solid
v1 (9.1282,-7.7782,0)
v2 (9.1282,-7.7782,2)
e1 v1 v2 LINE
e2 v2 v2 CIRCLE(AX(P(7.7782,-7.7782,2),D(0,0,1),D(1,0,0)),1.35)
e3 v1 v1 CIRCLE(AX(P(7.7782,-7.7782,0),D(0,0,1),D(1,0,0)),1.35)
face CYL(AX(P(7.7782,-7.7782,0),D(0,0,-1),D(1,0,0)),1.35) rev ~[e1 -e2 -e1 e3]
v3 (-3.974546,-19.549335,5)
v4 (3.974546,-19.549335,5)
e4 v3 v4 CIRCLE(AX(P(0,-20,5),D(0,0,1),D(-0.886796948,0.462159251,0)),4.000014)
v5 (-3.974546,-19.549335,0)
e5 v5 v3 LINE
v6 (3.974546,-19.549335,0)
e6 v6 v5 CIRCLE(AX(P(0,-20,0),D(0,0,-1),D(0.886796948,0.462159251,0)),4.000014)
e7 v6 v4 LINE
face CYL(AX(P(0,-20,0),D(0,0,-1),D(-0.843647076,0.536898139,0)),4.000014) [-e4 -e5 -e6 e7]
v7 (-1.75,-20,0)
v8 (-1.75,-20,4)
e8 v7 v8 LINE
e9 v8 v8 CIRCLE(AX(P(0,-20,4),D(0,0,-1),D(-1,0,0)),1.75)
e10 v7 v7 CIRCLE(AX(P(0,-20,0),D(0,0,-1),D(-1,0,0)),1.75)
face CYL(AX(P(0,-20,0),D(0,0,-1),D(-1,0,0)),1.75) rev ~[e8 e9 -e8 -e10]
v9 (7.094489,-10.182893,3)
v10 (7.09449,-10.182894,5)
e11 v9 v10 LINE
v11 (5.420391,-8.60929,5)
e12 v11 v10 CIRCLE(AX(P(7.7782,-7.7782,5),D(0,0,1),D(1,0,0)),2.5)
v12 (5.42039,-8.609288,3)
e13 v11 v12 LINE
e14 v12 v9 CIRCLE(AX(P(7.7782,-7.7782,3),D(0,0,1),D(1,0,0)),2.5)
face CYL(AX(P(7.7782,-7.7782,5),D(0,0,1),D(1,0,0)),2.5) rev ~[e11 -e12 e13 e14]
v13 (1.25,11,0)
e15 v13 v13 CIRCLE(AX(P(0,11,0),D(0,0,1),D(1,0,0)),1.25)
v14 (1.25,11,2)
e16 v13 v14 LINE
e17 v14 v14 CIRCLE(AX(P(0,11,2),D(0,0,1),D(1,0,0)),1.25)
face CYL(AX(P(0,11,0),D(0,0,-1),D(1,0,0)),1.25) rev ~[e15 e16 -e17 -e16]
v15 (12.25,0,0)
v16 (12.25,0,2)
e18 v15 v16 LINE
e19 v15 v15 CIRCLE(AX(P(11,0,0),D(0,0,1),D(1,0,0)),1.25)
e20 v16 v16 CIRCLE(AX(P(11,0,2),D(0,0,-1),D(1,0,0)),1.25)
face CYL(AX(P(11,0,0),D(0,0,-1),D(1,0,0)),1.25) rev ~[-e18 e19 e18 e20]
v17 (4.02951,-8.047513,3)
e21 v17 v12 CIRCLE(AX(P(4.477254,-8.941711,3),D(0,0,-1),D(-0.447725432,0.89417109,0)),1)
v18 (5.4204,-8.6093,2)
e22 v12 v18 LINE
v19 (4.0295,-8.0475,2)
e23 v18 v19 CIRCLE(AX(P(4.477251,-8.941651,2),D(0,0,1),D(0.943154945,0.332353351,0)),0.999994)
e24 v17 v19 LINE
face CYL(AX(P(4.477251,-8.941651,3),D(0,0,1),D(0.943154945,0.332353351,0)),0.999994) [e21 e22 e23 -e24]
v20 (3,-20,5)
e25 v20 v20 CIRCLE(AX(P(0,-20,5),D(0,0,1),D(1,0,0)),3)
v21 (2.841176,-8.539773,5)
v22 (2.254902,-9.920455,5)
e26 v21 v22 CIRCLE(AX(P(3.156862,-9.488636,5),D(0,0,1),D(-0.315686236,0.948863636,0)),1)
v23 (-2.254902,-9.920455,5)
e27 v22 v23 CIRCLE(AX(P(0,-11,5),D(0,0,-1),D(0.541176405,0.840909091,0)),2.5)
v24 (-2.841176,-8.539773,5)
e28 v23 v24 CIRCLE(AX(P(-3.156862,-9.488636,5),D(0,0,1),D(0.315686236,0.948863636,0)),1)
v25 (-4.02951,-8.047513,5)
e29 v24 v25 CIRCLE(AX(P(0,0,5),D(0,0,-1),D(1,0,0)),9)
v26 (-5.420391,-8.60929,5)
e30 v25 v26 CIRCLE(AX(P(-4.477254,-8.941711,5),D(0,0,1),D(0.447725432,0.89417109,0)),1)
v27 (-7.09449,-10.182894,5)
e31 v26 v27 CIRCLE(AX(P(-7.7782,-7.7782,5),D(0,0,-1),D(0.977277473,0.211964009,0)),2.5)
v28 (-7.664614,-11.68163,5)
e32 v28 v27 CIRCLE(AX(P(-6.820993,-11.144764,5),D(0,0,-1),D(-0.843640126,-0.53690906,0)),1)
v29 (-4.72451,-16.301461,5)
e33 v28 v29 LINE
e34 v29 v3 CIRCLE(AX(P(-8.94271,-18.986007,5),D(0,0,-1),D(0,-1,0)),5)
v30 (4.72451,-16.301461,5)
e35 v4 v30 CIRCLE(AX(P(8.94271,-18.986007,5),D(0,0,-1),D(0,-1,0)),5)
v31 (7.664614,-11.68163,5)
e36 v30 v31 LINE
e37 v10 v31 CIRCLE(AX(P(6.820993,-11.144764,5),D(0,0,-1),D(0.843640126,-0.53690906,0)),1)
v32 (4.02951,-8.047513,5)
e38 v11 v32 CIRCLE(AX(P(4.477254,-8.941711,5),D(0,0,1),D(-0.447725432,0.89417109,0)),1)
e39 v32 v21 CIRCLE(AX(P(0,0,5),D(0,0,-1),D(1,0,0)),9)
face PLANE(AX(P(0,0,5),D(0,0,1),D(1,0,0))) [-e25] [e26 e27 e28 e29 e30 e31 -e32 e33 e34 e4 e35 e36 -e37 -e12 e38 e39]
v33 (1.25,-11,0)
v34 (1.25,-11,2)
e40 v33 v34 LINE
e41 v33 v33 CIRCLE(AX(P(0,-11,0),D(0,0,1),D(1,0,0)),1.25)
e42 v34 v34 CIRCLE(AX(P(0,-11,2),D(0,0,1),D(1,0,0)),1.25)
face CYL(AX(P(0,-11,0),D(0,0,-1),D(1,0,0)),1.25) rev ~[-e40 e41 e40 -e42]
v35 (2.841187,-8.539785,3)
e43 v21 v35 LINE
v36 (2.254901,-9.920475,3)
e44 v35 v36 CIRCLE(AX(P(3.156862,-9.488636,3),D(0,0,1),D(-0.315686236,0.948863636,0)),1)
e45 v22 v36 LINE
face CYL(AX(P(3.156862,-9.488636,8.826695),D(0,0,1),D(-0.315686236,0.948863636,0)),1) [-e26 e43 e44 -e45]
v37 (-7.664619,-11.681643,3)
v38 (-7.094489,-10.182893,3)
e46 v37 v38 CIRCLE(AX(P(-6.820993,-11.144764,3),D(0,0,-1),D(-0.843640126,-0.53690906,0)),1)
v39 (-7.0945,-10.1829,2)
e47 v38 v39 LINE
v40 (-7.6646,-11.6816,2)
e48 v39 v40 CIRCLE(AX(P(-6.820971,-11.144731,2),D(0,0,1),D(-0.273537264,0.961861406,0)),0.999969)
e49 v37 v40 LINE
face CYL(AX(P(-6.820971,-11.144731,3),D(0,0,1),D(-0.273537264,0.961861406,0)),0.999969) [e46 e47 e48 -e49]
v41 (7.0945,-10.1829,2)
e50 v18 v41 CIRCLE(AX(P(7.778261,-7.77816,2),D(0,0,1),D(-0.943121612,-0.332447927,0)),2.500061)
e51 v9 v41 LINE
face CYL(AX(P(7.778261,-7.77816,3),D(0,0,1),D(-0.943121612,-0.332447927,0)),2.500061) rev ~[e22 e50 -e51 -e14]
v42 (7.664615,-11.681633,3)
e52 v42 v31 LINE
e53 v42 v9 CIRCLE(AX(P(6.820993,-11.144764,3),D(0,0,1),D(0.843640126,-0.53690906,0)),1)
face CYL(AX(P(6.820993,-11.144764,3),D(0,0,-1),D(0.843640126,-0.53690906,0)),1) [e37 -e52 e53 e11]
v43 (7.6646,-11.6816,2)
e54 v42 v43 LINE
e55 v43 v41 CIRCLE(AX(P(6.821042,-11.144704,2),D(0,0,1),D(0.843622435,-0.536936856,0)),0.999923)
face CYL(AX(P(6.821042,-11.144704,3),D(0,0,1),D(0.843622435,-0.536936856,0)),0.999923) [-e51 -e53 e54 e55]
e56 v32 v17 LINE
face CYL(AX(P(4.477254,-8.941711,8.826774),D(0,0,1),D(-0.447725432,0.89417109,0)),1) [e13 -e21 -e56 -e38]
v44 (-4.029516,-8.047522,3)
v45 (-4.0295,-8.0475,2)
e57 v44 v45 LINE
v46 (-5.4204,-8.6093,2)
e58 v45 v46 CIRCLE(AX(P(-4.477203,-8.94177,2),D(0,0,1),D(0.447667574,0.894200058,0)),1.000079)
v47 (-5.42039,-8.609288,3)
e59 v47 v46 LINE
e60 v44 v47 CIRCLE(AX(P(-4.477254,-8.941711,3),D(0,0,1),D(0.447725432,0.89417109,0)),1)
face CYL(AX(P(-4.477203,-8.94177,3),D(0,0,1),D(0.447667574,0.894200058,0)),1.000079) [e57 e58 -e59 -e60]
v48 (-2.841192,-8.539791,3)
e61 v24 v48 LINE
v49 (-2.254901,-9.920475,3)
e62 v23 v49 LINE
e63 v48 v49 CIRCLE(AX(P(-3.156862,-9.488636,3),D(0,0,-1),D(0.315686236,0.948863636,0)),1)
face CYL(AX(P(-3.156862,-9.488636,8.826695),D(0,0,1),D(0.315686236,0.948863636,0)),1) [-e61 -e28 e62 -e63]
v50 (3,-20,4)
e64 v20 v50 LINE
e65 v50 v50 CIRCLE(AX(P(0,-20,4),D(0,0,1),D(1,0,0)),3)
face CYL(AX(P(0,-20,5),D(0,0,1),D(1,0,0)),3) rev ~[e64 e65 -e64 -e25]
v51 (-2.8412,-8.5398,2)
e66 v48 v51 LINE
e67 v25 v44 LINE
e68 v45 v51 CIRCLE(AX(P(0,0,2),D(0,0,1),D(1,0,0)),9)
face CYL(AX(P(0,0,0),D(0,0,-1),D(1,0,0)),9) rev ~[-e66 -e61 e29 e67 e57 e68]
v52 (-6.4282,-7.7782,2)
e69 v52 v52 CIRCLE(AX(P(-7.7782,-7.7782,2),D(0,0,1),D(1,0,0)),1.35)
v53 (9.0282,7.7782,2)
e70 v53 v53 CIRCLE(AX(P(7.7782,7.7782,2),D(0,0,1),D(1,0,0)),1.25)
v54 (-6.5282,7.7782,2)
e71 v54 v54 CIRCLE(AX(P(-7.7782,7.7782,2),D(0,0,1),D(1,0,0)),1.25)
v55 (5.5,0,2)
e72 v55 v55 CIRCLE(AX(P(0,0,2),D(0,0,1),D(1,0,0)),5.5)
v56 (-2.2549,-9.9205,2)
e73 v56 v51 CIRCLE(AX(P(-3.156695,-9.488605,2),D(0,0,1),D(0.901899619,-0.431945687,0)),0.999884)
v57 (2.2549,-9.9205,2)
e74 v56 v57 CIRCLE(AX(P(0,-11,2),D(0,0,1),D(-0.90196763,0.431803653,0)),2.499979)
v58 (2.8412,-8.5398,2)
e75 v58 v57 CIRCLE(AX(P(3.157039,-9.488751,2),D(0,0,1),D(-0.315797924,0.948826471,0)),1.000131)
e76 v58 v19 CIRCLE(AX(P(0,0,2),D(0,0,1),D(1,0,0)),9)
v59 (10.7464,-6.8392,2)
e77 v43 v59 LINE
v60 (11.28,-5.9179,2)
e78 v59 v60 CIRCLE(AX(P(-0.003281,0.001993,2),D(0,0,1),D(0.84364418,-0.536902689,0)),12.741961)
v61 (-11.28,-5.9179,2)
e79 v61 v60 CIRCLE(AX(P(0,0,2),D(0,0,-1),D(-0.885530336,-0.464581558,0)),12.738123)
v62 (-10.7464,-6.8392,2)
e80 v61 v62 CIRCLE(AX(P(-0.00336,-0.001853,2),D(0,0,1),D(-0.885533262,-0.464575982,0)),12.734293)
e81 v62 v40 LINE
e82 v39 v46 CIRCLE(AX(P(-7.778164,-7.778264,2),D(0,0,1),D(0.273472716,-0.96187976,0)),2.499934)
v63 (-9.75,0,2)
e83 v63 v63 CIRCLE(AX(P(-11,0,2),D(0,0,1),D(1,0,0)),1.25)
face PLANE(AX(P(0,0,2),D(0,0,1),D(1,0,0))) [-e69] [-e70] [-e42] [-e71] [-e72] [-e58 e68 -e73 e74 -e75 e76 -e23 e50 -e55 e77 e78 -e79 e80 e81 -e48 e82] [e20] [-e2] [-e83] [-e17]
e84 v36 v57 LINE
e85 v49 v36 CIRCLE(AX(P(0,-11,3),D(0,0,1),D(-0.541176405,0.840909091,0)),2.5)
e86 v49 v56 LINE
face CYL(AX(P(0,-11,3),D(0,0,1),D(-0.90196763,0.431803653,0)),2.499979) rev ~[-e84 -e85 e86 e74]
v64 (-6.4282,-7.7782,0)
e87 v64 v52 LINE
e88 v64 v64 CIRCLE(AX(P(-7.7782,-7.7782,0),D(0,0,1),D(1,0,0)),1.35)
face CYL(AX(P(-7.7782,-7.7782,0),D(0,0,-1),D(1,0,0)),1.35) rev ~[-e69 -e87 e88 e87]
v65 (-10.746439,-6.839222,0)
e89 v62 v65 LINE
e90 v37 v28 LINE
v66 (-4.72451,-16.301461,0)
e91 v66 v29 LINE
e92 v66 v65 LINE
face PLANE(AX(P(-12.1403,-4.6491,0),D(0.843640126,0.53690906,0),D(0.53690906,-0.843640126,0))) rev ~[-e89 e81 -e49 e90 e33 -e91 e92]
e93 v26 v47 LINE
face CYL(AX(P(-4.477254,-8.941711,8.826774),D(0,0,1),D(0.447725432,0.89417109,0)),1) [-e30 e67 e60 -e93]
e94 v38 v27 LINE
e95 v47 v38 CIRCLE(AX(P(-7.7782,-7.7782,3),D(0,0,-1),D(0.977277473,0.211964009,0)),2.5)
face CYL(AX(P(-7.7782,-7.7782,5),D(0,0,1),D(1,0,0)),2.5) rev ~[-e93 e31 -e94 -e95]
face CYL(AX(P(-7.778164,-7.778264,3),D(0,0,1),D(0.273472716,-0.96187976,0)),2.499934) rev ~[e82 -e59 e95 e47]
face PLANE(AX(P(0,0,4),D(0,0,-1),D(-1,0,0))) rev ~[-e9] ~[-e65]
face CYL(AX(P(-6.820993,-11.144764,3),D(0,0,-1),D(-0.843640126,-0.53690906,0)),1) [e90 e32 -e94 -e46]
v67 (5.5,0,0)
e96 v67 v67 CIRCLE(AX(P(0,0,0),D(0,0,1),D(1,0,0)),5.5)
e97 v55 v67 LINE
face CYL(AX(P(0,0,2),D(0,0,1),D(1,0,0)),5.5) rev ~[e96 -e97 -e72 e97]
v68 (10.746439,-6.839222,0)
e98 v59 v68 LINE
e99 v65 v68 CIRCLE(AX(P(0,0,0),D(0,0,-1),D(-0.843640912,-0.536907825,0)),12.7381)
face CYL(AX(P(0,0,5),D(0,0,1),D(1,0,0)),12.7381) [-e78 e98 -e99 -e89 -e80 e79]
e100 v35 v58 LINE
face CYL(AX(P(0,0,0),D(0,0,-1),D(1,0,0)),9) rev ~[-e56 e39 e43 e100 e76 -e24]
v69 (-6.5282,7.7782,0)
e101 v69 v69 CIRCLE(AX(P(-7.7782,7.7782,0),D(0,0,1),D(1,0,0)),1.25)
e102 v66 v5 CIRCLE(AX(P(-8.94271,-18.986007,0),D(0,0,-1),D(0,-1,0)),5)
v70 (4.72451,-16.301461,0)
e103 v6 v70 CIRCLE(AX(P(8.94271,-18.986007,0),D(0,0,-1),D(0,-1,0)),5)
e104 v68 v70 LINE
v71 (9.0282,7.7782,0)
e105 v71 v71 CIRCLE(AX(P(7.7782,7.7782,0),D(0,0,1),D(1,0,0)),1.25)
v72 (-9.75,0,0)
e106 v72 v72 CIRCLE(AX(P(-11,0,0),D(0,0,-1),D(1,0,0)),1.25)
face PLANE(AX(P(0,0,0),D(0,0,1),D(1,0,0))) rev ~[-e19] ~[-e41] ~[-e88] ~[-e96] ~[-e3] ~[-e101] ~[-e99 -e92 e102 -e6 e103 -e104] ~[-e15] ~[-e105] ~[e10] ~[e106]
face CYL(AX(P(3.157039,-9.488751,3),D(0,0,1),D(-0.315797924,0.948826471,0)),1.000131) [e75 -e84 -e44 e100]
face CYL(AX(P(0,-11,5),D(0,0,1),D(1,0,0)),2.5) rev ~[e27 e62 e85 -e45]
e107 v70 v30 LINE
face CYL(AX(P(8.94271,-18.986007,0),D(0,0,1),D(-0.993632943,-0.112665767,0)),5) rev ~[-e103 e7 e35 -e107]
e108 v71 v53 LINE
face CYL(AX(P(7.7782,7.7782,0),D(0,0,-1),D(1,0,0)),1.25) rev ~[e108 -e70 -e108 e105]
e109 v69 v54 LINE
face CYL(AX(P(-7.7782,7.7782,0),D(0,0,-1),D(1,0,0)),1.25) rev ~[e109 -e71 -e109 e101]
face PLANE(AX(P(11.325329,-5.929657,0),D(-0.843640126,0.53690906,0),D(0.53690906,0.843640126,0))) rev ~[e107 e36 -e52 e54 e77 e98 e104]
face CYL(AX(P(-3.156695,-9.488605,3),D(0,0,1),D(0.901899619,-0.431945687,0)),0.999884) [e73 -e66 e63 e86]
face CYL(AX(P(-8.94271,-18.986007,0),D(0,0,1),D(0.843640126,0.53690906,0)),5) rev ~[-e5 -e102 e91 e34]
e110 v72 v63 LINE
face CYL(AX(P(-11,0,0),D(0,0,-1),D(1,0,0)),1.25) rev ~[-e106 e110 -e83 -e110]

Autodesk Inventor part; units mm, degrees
ref_plane "YZ Plane" through (0, 0, 0) normal (1, 0, 0) x (0, 1, 0)
ref_plane "XZ Plane" through (0, 0, 0) normal (0, 1, 0) x (-1, 0, 0)
ref_plane "작업 평면1" through (0, 0, 0) normal (0, 0, 1) x (1, 0, 0)
sketch "스케치1" plane through (0, 0, 0) normal (0, 0, 1) x (1, 0, 0)
  circle A0 centre (-11, 0) radius 1.25 projected
  circle A1 centre (11, 0) radius 1.25 projected
  circle A2 centre (7.7782, -7.7782) radius 1.25 projected
  circle A3 centre (-7.7782, 7.7782) radius 1.25 projected
  circle A4 centre (-7.7782, -7.7782) radius 1.25 projected
  circle A5 centre (7.7782, 7.7782) radius 1.25 projected
  circle A6 centre (0, -11) radius 1.25 projected
  circle A7 centre (0, 11) radius 1.25 projected
  circle A8 centre (0, 0) radius 14 projected
  circle A9 centre (0, 0) radius 5 projected
  line L0 (-17, -38.65) -> (-17, -41.35) projected
  line L1 (17, -38.65) -> (17, -41.35) projected
  line L2 (-17, -40) -> (17, -40)
  line L3 (0, -40) -> (0, 0)
  circle A10 centre (0, -20) radius 2.75
  line L4 (-7.7782, -7.7782) -> (0, -20) construction
  line L5 (-11.1527, -9.9258) -> (-3.3746, -22.1476)
  line L6 (3.3746, -17.8524) -> (-4.4036, -5.6305)
  arc A11 (-4.4036, -5.6305) -> (-11.1527, -9.9258) centre (-7.7782, -7.7782) ccw
  arc A12 (-3.3746, -22.1476) -> (3.3746, -17.8524) centre (0, -20) ccw
  line L7 (0, -20) -> (7.7782, -7.7782) construction
  line L8 (-3.3746, -17.8524) -> (4.4036, -5.6305)
  line L9 (11.1527, -9.9258) -> (3.3746, -22.1476)
  arc A13 (-3.3746, -17.8524) -> (3.3746, -22.1476) centre (0, -20) ccw
  arc A14 (11.1527, -9.9258) -> (4.4036, -5.6305) centre (7.7782, -7.7782) ccw
  circle A15 centre (0, 0) radius 7
  circle A16 centre (-7.7782, -7.7782) radius 1.35
  circle A17 centre (0, -11) radius 1.85
  circle A18 centre (7.7782, -7.7782) radius 1.35
  circle A19 centre (0, 0) radius 11
  circle A20 centre (0, 0) radius 9
  circle A21 centre (0, 0) radius 11
  circle A22 centre (0, 0) radius 13
  line L10 (7.7782, -7.7782) -> (0, -20) construction
  line L11 (6.0909, -6.7044) -> (-1.6873, -18.9262)
  line L12 (1.6873, -21.0738) -> (12.1403, -4.6491)
  arc A23 (9.4655, -8.852) -> (6.0909, -6.7044) centre (7.7782, -7.7782) ccw
  arc A24 (-1.6873, -18.9262) -> (1.6873, -21.0738) centre (0, -20) ccw
  line L13 (0, -20) -> (-7.7782, -7.7782) construction
  line L14 (1.6873, -18.9262) -> (-6.0909, -6.7044)
  line L15 (-12.1403, -4.6491) -> (-1.6873, -21.0738)
  arc A25 (-1.6873, -21.0738) -> (1.6873, -18.9262) centre (0, -20) ccw
  arc A26 (-6.0909, -6.7044) -> (-9.4655, -8.852) centre (-7.7782, -7.7782) ccw
  point P0 (-3.8891, -13.8891)
  point P1 (3.8891, -13.8891)
  point P2 (4.9497, -4.9497)
  point P3 (-4.9497, -4.9497)
  point P4 (0.2013, -12.2337)
  point P5 (0, -12.5499)
  point P6 (-0.2013, -12.2337)
  point P7 (3.8891, -13.8891)
  point P8 (-3.8891, -13.8891)
  point P9 (-3.5472, -18.1514)
  point P10 (-3.3746, -22.1476)
  point P11 (3.5472, -18.1514)
  dimension "d0" = 5.5
  dimension "d1" = 8
  dimension "d2" = 2.7
  dimension "d3" = 3.7
  dimension "d4" = 2.7
  dimension "d7" = 2
  dimension "d8" = 2
  dimension "d9" = 2
  dimension "d10" = 4
  dimension "d11" = 4
extrude "돌출1" add sketch "스케치1" along normal blind 5 contours A0 A19 A3 A7 A5 A1 A14 A20 A11 | A0 A19 A11 L15 A22 L12 A14 A1 A5 A7 A3 | A19 A26 L15 A11 | A11 A20 A26 A19 | A26 L14 A19 A16 | A19 A16 L14 A22 L15 A26 | A20 L6 A17 A19 L14 A26 | A14 A19 A23 A20 | A20 L3 A17 L6 | A22 L14 A8 L15 | A20 L8 A17 L3 | A14 L12 A23 A19 | A23 L11 A19 A17 L8 A20 | A23 A19 A18 L11 | A17 L3 A6 L6 | L6 A6 A19 A17 | A19 A17 L8 A22 L14 | A8 L14 L8 A13 L15 | A22 L8 A8 L14 | A17 L8 A6 L3 | A23 L12 A22 L11 A19 A18 | A19 A6 L6 L8 A17 | A8 L8 L14 | L15 A10 L3 A12 A13 | A13 L8 L14 L11 A10 L15 | A22 L3 A8 L8 | L8 A17 L3 A22 | A17 A19 A6 L8 | L11 A22 L6 A17 A19 | L8 L3 A17 | L12 A12 L6 L11 A8 | A8 L11 A22 L12 | A8 L3 L14 L8 | L3 A10 L12 A12 | A22 L6 A8 L3 | L3 A17 L6 A22 | A17 L6 L8 A6 A19 | L11 A8 L6 A22 | A6 L3 L6 | L6 A17 L3 | L3 A6 L8 | L11 L6 A8 | L12 A10 L14 L11 L6 A12 | A8 L6 L11 L3 | L14 A10 L3 | L3 A10 L11
sketch "스케치2" plane through (0, 0, 5) normal (0, 0, 1) x (1, 0, 0)
  circle A0 centre (0, -11) radius 1.25 projected
  circle A1 centre (7.7782, -7.7782) radius 1.35 projected
  circle A2 centre (-11, 0) radius 1.25 projected
  circle A3 centre (-7.7782, -7.7782) radius 1.35 projected
  circle A4 centre (0, -20) radius 2.75 projected
  circle A5 centre (0, 0) radius 9 projected
  circle A6 centre (-7.7782, 7.7782) radius 1.25 projected
  circle A7 centre (0, 11) radius 1.25 projected
  circle A8 centre (7.7782, 7.7782) radius 1.25 projected
  circle A9 centre (11, 0) radius 1.25 projected
  arc A10 (12.1403, -4.6491) -> (-12.1403, -4.6491) centre (0, 0) ccw projected
  line L0 (-12.1403, -4.6491) -> (-3.5472, -18.1514) projected
  arc A11 (-3.5472, -18.1514) -> (3.5472, -18.1514) centre (0, -20) ccw projected
  line L1 (3.5472, -18.1514) -> (12.1403, -4.6491) projected
  circle A12 centre (0, 0) radius 12.7381
  line L2 (3.5472, -18.1514) -> (12.1403, -4.6491) projected
  point P0 (-10.7464, -6.8392)
  point P1 (10.7464, -6.8392)
extrude "돌출2" cut sketch "스케치2" against normal through all contours L1 A12 L0 A10
sketch "스케치3" plane through (0, 0, 5) normal (0, 0, 1) x (1, 0, 0)
  circle A0 centre (7.7782, -7.7782) radius 1.35 projected
  circle A1 centre (7.7782, -7.7782) radius 2.5
  circle A2 centre (11, 0) radius 2.5
  circle A3 centre (7.7782, 7.7782) radius 2.5
  circle A4 centre (0, 11) radius 2.5
  circle A5 centre (-7.7782, 7.7782) radius 2.5
  circle A6 centre (-11, 0) radius 2.5
  circle A7 centre (-7.7782, -7.7782) radius 2.5
  circle A8 centre (0, -11) radius 2.5
  point P0 (0, 0)
  dimension "d14" = 5
  dimension "d17" = 360
extrude "돌출3" cut sketch "스케치3" against normal blind 2 contours A0 | A1 | A2 | A3 | A4 | A5 | A6 | A7 | A8
fillet "모깎기1" radius 1 30 edges at (7.2483, -5.335, 4) (5.335, -7.2483, 4) (10.2708, -7.5865, 4) (8.6601, -10.1175, 4) (12.5914, 1.9281, 4) (12.5914, -1.9281, 4) (8.8977, -1.3529, 4) (8.8977, 1.3529, 4) (1.3529, -8.8977, 4) (-1.3529, -8.8977, 4) (-5.335, -7.2483, 4) (-7.2483, -5.335, 4) (-8.8977, -1.3529, 4) (-8.8977, 1.3529, 4) (-8.6601, -10.1175, 4) (-10.2708, -7.5865, 4) (7.5401, 10.2668, 4) (10.2668, 7.5401, 4) (5.335, 7.2483, 4) (7.2483, 5.335, 4) (-1.9281, 12.5914, 4) (1.9281, 12.5914, 4) (-1.3529, 8.8977, 4) (1.3529, 8.8977, 4) (-7.2483, 5.335, 4) (-5.335, 7.2483, 4) (-10.2668, 7.5401, 4) (-7.5401, 10.2668, 4) (-12.5914, -1.9281, 4) (-12.5914, 1.9281, 4)
fillet "모깎기2" radius 5 2 edges at (-3.5472, -18.1514, 2.5) (3.5472, -18.1514, 2.5)
sketch "스케치4" plane through (0, 0, 0) normal (0, 0, -1) x (-1, 0, 0)
  arc A0 (10.7464, -6.8392) -> (-10.7464, -6.8392) centre (0, 0) ccw projected
  line L0 (-4.7245, -16.3015) -> (-10.7464, -6.8392) projected
  arc A1 (-3.9745, -19.5493) -> (-4.7245, -16.3015) centre (-8.9427, -18.986) ccw projected
  arc A2 (-3.9745, -19.5493) -> (3.9745, -19.5493) centre (0, -20) ccw projected
  arc A3 (4.7245, -16.3015) -> (3.9745, -19.5493) centre (8.9427, -18.986) ccw projected
  line L1 (10.7464, -6.8392) -> (4.7245, -16.3015) projected
  circle A4 centre (0, -11) radius 1.25 projected
  circle A5 centre (-7.7782, -7.7782) radius 1.35 projected
  circle A6 centre (11, 0) radius 1.25 projected
  circle A7 centre (7.7782, -7.7782) radius 1.35 projected
  circle A8 centre (0, -20) radius 2.75 projected
  circle A9 centre (0, 0) radius 9 projected
  circle A10 centre (7.7782, 7.7782) radius 1.25 projected
  circle A11 centre (0, 11) radius 1.25 projected
  circle A12 centre (-7.7782, 7.7782) radius 1.25 projected
  circle A13 centre (-11, 0) radius 1.25 projected
  circle A14 centre (0, -20) radius 2 projected
  circle A15 centre (0, -20) radius 3 projected
ref_plane "작업 평면2" through (-3.18, -23.18, 4) normal (0, 0, -1) x (-0.0608395, 0.9981476, 0)
extrude "돌출4" add sketch "스케치4" against normal up to surface (4 mm away) contours A8
sketch "스케치5" plane through (0, 0, 0) normal (0, 0, -1) x (-1, 0, 0)
  circle A0 centre (0, -20) radius 2 projected
  arc A1 (10.7464, -6.8392) -> (-10.7464, -6.8392) centre (0, 0) ccw projected
  line L0 (-4.7245, -16.3015) -> (-10.7464, -6.8392) projected
  arc A2 (-3.9745, -19.5493) -> (-4.7245, -16.3015) centre (-8.9427, -18.986) ccw projected
  arc A3 (-3.9745, -19.5493) -> (3.9745, -19.5493) centre (0, -20) ccw projected
  arc A4 (4.7245, -16.3015) -> (3.9745, -19.5493) centre (8.9427, -18.986) ccw projected
  line L1 (10.7464, -6.8392) -> (4.7245, -16.3015) projected
  circle A5 centre (0, -11) radius 1.25 projected
  circle A6 centre (-7.7782, -7.7782) radius 1.35 projected
  circle A7 centre (11, 0) radius 1.25 projected
  circle A8 centre (7.7782, -7.7782) radius 1.35 projected
  circle A9 centre (0, 0) radius 9 projected
  circle A10 centre (7.7782, 7.7782) radius 1.25 projected
  circle A11 centre (0, 11) radius 1.25 projected
  circle A12 centre (-7.7782, 7.7782) radius 1.25 projected
  circle A13 centre (-11, 0) radius 1.25 projected
  circle A14 centre (0, -20) radius 1.75
  dimension "d25" = 3.5
extrude "돌출5" add sketch "스케치5" against normal up to surface (4 mm away) contours A0
sketch "스케치6" plane through (0, 0, 3) normal (0, 0, 1) x (1, 0, 0)
  arc A0 (-4.0295, 8.0475) -> (-8.0475, 4.0295) centre (0, 0) ccw projected
  arc A1 (-5.4204, 8.6093) -> (-4.0295, 8.0475) centre (-4.4772, 8.9417) ccw projected
  arc A2 (-5.4204, 8.6093) -> (-6.1176, 9.647) centre (-7.7782, 7.7782) ccw projected
  arc A3 (-5.9179, 11.28) -> (-6.1176, 9.647) centre (-5.4533, 10.3945) ccw projected
  arc A4 (-5.9179, 11.28) -> (-11.28, 5.9179) centre (0, 0) ccw projected
  arc A5 (-9.647, 6.1176) -> (-11.28, 5.9179) centre (-10.3945, 5.4533) ccw projected
  arc A6 (-9.647, 6.1176) -> (-8.6093, 5.4204) centre (-7.7782, 7.7782) ccw projected
  arc A7 (-8.0475, 4.0295) -> (-8.6093, 5.4204) centre (-8.9417, 4.4772) ccw projected
  circle A8 centre (-7.7782, 7.7782) radius 1.25 projected
  circle A9 centre (0, 11) radius 1.25 projected
  arc A10 (2.8412, 8.5398) -> (-2.8412, 8.5398) centre (0, 0) ccw projected
  arc A11 (2.2549, 9.9205) -> (2.8412, 8.5398) centre (3.1569, 9.4886) ccw projected
  arc A12 (2.2549, 9.9205) -> (2.4957, 11.1472) centre (0, 11) ccw projected
  arc A13 (3.7916, 12.1608) -> (2.4957, 11.1472) centre (3.4939, 11.2061) ccw projected
  arc A14 (3.7916, 12.1608) -> (-3.7916, 12.1608) centre (0, 0) ccw projected
  arc A15 (-2.4957, 11.1472) -> (-3.7916, 12.1608) centre (-3.4939, 11.2061) ccw projected
  arc A16 (-2.4957, 11.1472) -> (-2.2549, 9.9205) centre (0, 11) ccw projected
  arc A17 (-2.8412, 8.5398) -> (-2.2549, 9.9205) centre (-3.1569, 9.4886) ccw projected
  circle A18 centre (7.7782, 7.7782) radius 1.25 projected
  arc A19 (8.0475, 4.0295) -> (4.0295, 8.0475) centre (0, 0) ccw projected
  arc A20 (8.6093, 5.4204) -> (8.0475, 4.0295) centre (8.9417, 4.4772) ccw projected
  arc A21 (8.6093, 5.4204) -> (9.647, 6.1176) centre (7.7782, 7.7782) ccw projected
  arc A22 (11.28, 5.9179) -> (9.647, 6.1176) centre (10.3945, 5.4533) ccw projected
  arc A23 (11.28, 5.9179) -> (5.9179, 11.28) centre (0, 0) ccw projected
  arc A24 (6.1176, 9.647) -> (5.9179, 11.28) centre (5.4533, 10.3945) ccw projected
  arc A25 (6.1176, 9.647) -> (5.4204, 8.6093) centre (7.7782, 7.7782) ccw projected
  arc A26 (4.0295, 8.0475) -> (5.4204, 8.6093) centre (4.4772, 8.9417) ccw projected
  circle A27 centre (11, 0) radius 1.25 projected
  arc A28 (8.5398, -2.8412) -> (8.5398, 2.8412) centre (0, 0) ccw projected
  arc A29 (9.9205, -2.2549) -> (8.5398, -2.8412) centre (9.4886, -3.1569) ccw projected
  arc A30 (9.9205, -2.2549) -> (11.1472, -2.4957) centre (11, 0) ccw projected
  arc A31 (12.1608, -3.7916) -> (11.1472, -2.4957) centre (11.2061, -3.4939) ccw projected
  arc A32 (12.1608, -3.7916) -> (12.1608, 3.7916) centre (0, 0) ccw projected
  arc A33 (11.1472, 2.4957) -> (12.1608, 3.7916) centre (11.2061, 3.4939) ccw projected
  arc A34 (11.1472, 2.4957) -> (9.9205, 2.2549) centre (11, 0) ccw projected
  arc A35 (8.5398, 2.8412) -> (9.9205, 2.2549) centre (9.4886, 3.1569) ccw projected
  arc A36 (4.0295, -8.0475) -> (8.0475, -4.0295) centre (0, 0) ccw projected
  arc A37 (5.4204, -8.6093) -> (4.0295, -8.0475) centre (4.4772, -8.9417) ccw projected
  arc A38 (5.4204, -8.6093) -> (7.0945, -10.1829) centre (7.7782, -7.7782) ccw projected
  arc A39 (7.6646, -11.6816) -> (7.0945, -10.1829) centre (6.821, -11.1447) ccw projected
  line L0 (7.6646, -11.6816) -> (10.7464, -6.8392) projected
  arc A40 (10.7464, -6.8392) -> (11.28, -5.9179) centre (0, 0) ccw projected
  arc A41 (9.647, -6.1176) -> (11.28, -5.9179) centre (10.3945, -5.4533) ccw projected
  arc A42 (9.647, -6.1176) -> (8.6093, -5.4204) centre (7.7782, -7.7782) ccw projected
  arc A43 (8.0475, -4.0295) -> (8.6093, -5.4204) centre (8.9417, -4.4772) ccw projected
  circle A44 centre (7.7782, -7.7782) radius 1.35 projected
  arc A45 (-2.8412, -8.5398) -> (2.8412, -8.5398) centre (0, 0) ccw projected
  arc A46 (-2.2549, -9.9205) -> (-2.8412, -8.5398) centre (-3.1569, -9.4886) ccw projected
  arc A47 (-2.2549, -9.9205) -> (2.2549, -9.9205) centre (0, -11) ccw projected
  arc A48 (2.8412, -8.5398) -> (2.2549, -9.9205) centre (3.1569, -9.4886) ccw projected
  circle A49 centre (0, -11) radius 1.25 projected
  line L1 (-10.7464, -6.8392) -> (-7.6646, -11.6816) projected
  arc A50 (-7.0945, -10.1829) -> (-7.6646, -11.6816) centre (-6.821, -11.1447) ccw projected
  arc A51 (-7.0945, -10.1829) -> (-5.4204, -8.6093) centre (-7.7782, -7.7782) ccw projected
  arc A52 (-4.0295, -8.0475) -> (-5.4204, -8.6093) centre (-4.4772, -8.9417) ccw projected
  arc A53 (-8.0475, -4.0295) -> (-4.0295, -8.0475) centre (0, 0) ccw projected
  arc A54 (-8.6093, -5.4204) -> (-8.0475, -4.0295) centre (-8.9417, -4.4772) ccw projected
  arc A55 (-8.6093, -5.4204) -> (-9.647, -6.1176) centre (-7.7782, -7.7782) ccw projected
  arc A56 (-11.28, -5.9179) -> (-9.647, -6.1176) centre (-10.3945, -5.4533) ccw projected
  arc A57 (-11.28, -5.9179) -> (-10.7464, -6.8392) centre (0, 0) ccw projected
  circle A58 centre (-7.7782, -7.7782) radius 1.35 projected
  arc A59 (-8.5398, 2.8412) -> (-8.5398, -2.8412) centre (0, 0) ccw projected
  arc A60 (-9.9205, 2.2549) -> (-8.5398, 2.8412) centre (-9.4886, 3.1569) ccw projected
  arc A61 (-9.9205, 2.2549) -> (-11.1472, 2.4957) centre (-11, 0) ccw projected
  arc A62 (-12.1608, 3.7916) -> (-11.1472, 2.4957) centre (-11.2061, 3.4939) ccw projected
  arc A63 (-12.1608, 3.7916) -> (-12.1608, -3.7916) centre (0, 0) ccw projected
  arc A64 (-11.1472, -2.4957) -> (-12.1608, -3.7916) centre (-11.2061, -3.4939) ccw projected
  arc A65 (-11.1472, -2.4957) -> (-9.9205, -2.2549) centre (-11, 0) ccw projected
  arc A66 (-8.5398, -2.8412) -> (-9.9205, -2.2549) centre (-9.4886, -3.1569) ccw projected
  circle A67 centre (-11, 0) radius 1.25 projected
extrude "돌출6" cut sketch "스케치6" against normal blind 1 contours A0 A7 A6 A5 A4 A3 A2 A1 | A10 A17 A16 A15 A14 A13 A12 A11 | A19 A26 A25 A24 A23 A22 A21 A20 | A27 | A28 A35 A34 A33 A32 A31 A30 A29 | A36 A43 A42 A41 A40 L0 A39 A38 A37 | A45 A48 A47 A46 | A57 A56 A55 A54 A53 A52 A51 A50 L1 | A59 A66 A65 A64 A63 A62 A61 A60
sketch "스케치7" plane through (0, 0, 5) normal (0, 0, 1) x (1, 0, 0)
  circle A0 centre (0, -20) radius 1.75 projected
  arc A1 (10.7464, -6.8392) -> (-10.7464, -6.8392) centre (0, 0) ccw projected
  line L0 (4.7245, -16.3015) -> (10.7464, -6.8392) projected
  arc A2 (4.7245, -16.3015) -> (3.9745, -19.5493) centre (8.9427, -18.986) ccw projected
  arc A3 (-3.9745, -19.5493) -> (3.9745, -19.5493) centre (0, -20) ccw projected
  arc A4 (-3.9745, -19.5493) -> (-4.7245, -16.3015) centre (-8.9427, -18.986) ccw projected
  line L1 (-10.7464, -6.8392) -> (-4.7245, -16.3015) projected
  circle A5 centre (0, -11) radius 1.25 projected
  circle A6 centre (7.7782, -7.7782) radius 1.35 projected
  circle A7 centre (-11, 0) radius 1.25 projected
  circle A8 centre (-7.7782, -7.7782) radius 1.35 projected
  circle A9 centre (0, 0) radius 9 projected
  circle A10 centre (-7.7782, 7.7782) radius 1.25 projected
  circle A11 centre (0, 11) radius 1.25 projected
  circle A12 centre (7.7782, 7.7782) radius 1.25 projected
  circle A13 centre (11, 0) radius 1.25 projected
  arc A14 (-7.0945, -10.1829) -> (-7.6646, -11.6816) centre (-6.821, -11.1447) ccw projected
  line L2 (-7.6646, -11.6816) -> (-4.7245, -16.3015) projected
  arc A15 (-3.9745, -19.5493) -> (-4.7245, -16.3015) centre (-8.9427, -18.986) ccw projected
  arc A16 (-3.9745, -19.5493) -> (3.9745, -19.5493) centre (0, -20) ccw projected
  arc A17 (4.7245, -16.3015) -> (3.9745, -19.5493) centre (8.9427, -18.986) ccw projected
  line L3 (4.7245, -16.3015) -> (7.6646, -11.6816) projected
  arc A18 (7.6646, -11.6816) -> (7.0945, -10.1829) centre (6.821, -11.1447) ccw projected
  arc A19 (5.4204, -8.6093) -> (7.0945, -10.1829) centre (7.7782, -7.7782) ccw projected
  arc A20 (5.4204, -8.6093) -> (4.0295, -8.0475) centre (4.4772, -8.9417) ccw projected
  arc A21 (2.8412, -8.5398) -> (4.0295, -8.0475) centre (0, 0) ccw projected
  arc A22 (2.8412, -8.5398) -> (2.2549, -9.9205) centre (3.1569, -9.4886) ccw projected
  arc A23 (-2.2549, -9.9205) -> (2.2549, -9.9205) centre (0, -11) ccw projected
  arc A24 (-2.2549, -9.9205) -> (-2.8412, -8.5398) centre (-3.1569, -9.4886) ccw projected
  arc A25 (-4.0295, -8.0475) -> (-2.8412, -8.5398) centre (0, 0) ccw projected
  arc A26 (-4.0295, -8.0475) -> (-5.4204, -8.6093) centre (-4.4772, -8.9417) ccw projected
  arc A27 (-7.0945, -10.1829) -> (-5.4204, -8.6093) centre (-7.7782, -7.7782) ccw projected
  circle A28 centre (0, -20) radius 2.75 projected
  point P0 (-7.6646, -11.6816)
extrude "돌출7" cut sketch "스케치7" against normal up to surface (3 mm away) contours L0 A18 A19 A20 A9 A26 A27 A14 L1 A1
sketch "스케치8" plane through (0, 0, 5) normal (0, 0, 1) x (1, 0, 0)
  circle A0 centre (0, -20) radius 3 projected
  line L0 (-4.4046, -19.0784) -> (-4.3953, -20.9652) projected
  arc A1 (-4.3953, -20.9652) -> (4.4046, -20.9216) centre (0, -20) ccw projected
  line L1 (4.4046, -20.9216) -> (4.3953, -19.0348) projected
  arc A2 (4.3953, -19.0348) -> (-4.4046, -19.0784) centre (0, -20) ccw projected
  arc A3 (-7.0945, -10.1829) -> (-7.6646, -11.6816) centre (-6.821, -11.1447) ccw projected
  line L2 (-7.6646, -11.6816) -> (-4.7245, -16.3015) projected
  arc A4 (-3.9745, -19.5493) -> (-4.7245, -16.3015) centre (-8.9427, -18.986) ccw projected
  arc A5 (-3.9745, -19.5493) -> (3.9745, -19.5493) centre (0, -20) ccw projected
  arc A6 (4.7245, -16.3015) -> (3.9745, -19.5493) centre (8.9427, -18.986) ccw projected
  line L3 (4.7245, -16.3015) -> (7.6646, -11.6816) projected
  arc A7 (7.6646, -11.6816) -> (7.0945, -10.1829) centre (6.821, -11.1447) ccw projected
  arc A8 (5.4204, -8.6093) -> (7.0945, -10.1829) centre (7.7782, -7.7782) ccw projected
  arc A9 (5.4204, -8.6093) -> (4.0295, -8.0475) centre (4.4772, -8.9417) ccw projected
  arc A10 (2.8412, -8.5398) -> (4.0295, -8.0475) centre (0, 0) ccw projected
  arc A11 (2.8412, -8.5398) -> (2.2549, -9.9205) centre (3.1569, -9.4886) ccw projected
  arc A12 (-2.2549, -9.9205) -> (2.2549, -9.9205) centre (0, -11) ccw projected
  arc A13 (-2.2549, -9.9205) -> (-2.8412, -8.5398) centre (-3.1569, -9.4886) ccw projected
  arc A14 (-4.0295, -8.0475) -> (-2.8412, -8.5398) centre (0, 0) ccw projected
  arc A15 (-4.0295, -8.0475) -> (-5.4204, -8.6093) centre (-4.4772, -8.9417) ccw projected
  arc A16 (-7.0945, -10.1829) -> (-5.4204, -8.6093) centre (-7.7782, -7.7782) ccw projected
  circle A17 centre (0, -20) radius 2.75 projected
extrude "돌출8" cut sketch "스케치8" against normal up to surface (1 mm away) contours A0
sketch "스케치9" plane through (0, 0, 2) normal (0, 0, 1) x (1, 0, 0)
  circle A0 centre (11, 0) radius 1.25 projected
  circle A1 centre (-11, 0) radius 1.25 projected
  circle A2 centre (-7.7782, 7.7782) radius 1.25 projected
  circle A3 centre (7.7782, -7.7782) radius 1.25 projected
  circle A4 centre (7.7782, 7.7782) radius 1.25 projected
  circle A5 centre (-7.7782, -7.7782) radius 1.25 projected
  circle A6 centre (0, 11) radius 1.25 projected
  circle A7 centre (0, -11) radius 1.25 projected
  circle A8 centre (0, 0) radius 14 projected
  circle A9 centre (0, 0) radius 5 projected
  circle A10 centre (0, 0) radius 5.5
  circle A11 centre (11, 0) radius 1.25 projected
  circle A12 centre (7.7782, 7.7782) radius 1.25 projected
  circle A13 centre (-7.7782, 7.7782) radius 1.25 projected
  circle A14 centre (0, 11) radius 1.25 projected
  circle A15 centre (-11, 0) radius 1.25 projected
  circle A16 centre (-7.7782, -7.7782) radius 1.35 projected
  arc A17 (7.6646, -11.6816) -> (7.0945, -10.1829) centre (6.821, -11.1447) ccw projected
  line L0 (10.7464, -6.8392) -> (7.6646, -11.6816) projected
  arc A18 (10.7464, -6.8392) -> (-10.7464, -6.8392) centre (0, 0) ccw projected
  line L1 (-7.6646, -11.6816) -> (-10.7464, -6.8392) projected
  arc A19 (-7.0945, -10.1829) -> (-7.6646, -11.6816) centre (-6.821, -11.1447) ccw projected
  arc A20 (-7.0945, -10.1829) -> (-5.4204, -8.6093) centre (-7.7782, -7.7782) ccw projected
  arc A21 (-4.0295, -8.0475) -> (-5.4204, -8.6093) centre (-4.4772, -8.9417) ccw projected
  arc A22 (4.0295, -8.0475) -> (-4.0295, -8.0475) centre (0, 0) ccw projected
  arc A23 (5.4204, -8.6093) -> (4.0295, -8.0475) centre (4.4772, -8.9417) ccw projected
  arc A24 (5.4204, -8.6093) -> (7.0945, -10.1829) centre (7.7782, -7.7782) ccw projected
  circle A25 centre (7.7782, -7.7782) radius 1.35 projected
  circle A26 centre (0, -20) radius 1.75 projected
  arc A27 (10.7464, -6.8392) -> (-10.7464, -6.8392) centre (0, 0) ccw projected
  line L2 (4.7245, -16.3015) -> (10.7464, -6.8392) projected
  arc A28 (4.7245, -16.3015) -> (3.9745, -19.5493) centre (8.9427, -18.986) ccw projected
  arc A29 (-3.9745, -19.5493) -> (3.9745, -19.5493) centre (0, -20) ccw projected
  arc A30 (-3.9745, -19.5493) -> (-4.7245, -16.3015) centre (-8.9427, -18.986) ccw projected
  line L3 (-10.7464, -6.8392) -> (-4.7245, -16.3015) projected
  circle A31 centre (0, -11) radius 1.25 projected
  circle A32 centre (7.7782, -7.7782) radius 1.35 projected
  circle A33 centre (-11, 0) radius 1.25 projected
  circle A34 centre (-7.7782, -7.7782) radius 1.35 projected
  circle A35 centre (0, 0) radius 9 projected
  circle A36 centre (-7.7782, 7.7782) radius 1.25 projected
  circle A37 centre (0, 11) radius 1.25 projected
  circle A38 centre (7.7782, 7.7782) radius 1.25 projected
  circle A39 centre (11, 0) radius 1.25 projected
  point P0 (-4.0295, -8.0475)
  dimension "d34" = 0.5
extrude "돌출9" add sketch "스케치9" against normal up to surface (2 mm away) contours A22 A35
properties part number "Slider_crank_horn" material "알루미늄 6061"
